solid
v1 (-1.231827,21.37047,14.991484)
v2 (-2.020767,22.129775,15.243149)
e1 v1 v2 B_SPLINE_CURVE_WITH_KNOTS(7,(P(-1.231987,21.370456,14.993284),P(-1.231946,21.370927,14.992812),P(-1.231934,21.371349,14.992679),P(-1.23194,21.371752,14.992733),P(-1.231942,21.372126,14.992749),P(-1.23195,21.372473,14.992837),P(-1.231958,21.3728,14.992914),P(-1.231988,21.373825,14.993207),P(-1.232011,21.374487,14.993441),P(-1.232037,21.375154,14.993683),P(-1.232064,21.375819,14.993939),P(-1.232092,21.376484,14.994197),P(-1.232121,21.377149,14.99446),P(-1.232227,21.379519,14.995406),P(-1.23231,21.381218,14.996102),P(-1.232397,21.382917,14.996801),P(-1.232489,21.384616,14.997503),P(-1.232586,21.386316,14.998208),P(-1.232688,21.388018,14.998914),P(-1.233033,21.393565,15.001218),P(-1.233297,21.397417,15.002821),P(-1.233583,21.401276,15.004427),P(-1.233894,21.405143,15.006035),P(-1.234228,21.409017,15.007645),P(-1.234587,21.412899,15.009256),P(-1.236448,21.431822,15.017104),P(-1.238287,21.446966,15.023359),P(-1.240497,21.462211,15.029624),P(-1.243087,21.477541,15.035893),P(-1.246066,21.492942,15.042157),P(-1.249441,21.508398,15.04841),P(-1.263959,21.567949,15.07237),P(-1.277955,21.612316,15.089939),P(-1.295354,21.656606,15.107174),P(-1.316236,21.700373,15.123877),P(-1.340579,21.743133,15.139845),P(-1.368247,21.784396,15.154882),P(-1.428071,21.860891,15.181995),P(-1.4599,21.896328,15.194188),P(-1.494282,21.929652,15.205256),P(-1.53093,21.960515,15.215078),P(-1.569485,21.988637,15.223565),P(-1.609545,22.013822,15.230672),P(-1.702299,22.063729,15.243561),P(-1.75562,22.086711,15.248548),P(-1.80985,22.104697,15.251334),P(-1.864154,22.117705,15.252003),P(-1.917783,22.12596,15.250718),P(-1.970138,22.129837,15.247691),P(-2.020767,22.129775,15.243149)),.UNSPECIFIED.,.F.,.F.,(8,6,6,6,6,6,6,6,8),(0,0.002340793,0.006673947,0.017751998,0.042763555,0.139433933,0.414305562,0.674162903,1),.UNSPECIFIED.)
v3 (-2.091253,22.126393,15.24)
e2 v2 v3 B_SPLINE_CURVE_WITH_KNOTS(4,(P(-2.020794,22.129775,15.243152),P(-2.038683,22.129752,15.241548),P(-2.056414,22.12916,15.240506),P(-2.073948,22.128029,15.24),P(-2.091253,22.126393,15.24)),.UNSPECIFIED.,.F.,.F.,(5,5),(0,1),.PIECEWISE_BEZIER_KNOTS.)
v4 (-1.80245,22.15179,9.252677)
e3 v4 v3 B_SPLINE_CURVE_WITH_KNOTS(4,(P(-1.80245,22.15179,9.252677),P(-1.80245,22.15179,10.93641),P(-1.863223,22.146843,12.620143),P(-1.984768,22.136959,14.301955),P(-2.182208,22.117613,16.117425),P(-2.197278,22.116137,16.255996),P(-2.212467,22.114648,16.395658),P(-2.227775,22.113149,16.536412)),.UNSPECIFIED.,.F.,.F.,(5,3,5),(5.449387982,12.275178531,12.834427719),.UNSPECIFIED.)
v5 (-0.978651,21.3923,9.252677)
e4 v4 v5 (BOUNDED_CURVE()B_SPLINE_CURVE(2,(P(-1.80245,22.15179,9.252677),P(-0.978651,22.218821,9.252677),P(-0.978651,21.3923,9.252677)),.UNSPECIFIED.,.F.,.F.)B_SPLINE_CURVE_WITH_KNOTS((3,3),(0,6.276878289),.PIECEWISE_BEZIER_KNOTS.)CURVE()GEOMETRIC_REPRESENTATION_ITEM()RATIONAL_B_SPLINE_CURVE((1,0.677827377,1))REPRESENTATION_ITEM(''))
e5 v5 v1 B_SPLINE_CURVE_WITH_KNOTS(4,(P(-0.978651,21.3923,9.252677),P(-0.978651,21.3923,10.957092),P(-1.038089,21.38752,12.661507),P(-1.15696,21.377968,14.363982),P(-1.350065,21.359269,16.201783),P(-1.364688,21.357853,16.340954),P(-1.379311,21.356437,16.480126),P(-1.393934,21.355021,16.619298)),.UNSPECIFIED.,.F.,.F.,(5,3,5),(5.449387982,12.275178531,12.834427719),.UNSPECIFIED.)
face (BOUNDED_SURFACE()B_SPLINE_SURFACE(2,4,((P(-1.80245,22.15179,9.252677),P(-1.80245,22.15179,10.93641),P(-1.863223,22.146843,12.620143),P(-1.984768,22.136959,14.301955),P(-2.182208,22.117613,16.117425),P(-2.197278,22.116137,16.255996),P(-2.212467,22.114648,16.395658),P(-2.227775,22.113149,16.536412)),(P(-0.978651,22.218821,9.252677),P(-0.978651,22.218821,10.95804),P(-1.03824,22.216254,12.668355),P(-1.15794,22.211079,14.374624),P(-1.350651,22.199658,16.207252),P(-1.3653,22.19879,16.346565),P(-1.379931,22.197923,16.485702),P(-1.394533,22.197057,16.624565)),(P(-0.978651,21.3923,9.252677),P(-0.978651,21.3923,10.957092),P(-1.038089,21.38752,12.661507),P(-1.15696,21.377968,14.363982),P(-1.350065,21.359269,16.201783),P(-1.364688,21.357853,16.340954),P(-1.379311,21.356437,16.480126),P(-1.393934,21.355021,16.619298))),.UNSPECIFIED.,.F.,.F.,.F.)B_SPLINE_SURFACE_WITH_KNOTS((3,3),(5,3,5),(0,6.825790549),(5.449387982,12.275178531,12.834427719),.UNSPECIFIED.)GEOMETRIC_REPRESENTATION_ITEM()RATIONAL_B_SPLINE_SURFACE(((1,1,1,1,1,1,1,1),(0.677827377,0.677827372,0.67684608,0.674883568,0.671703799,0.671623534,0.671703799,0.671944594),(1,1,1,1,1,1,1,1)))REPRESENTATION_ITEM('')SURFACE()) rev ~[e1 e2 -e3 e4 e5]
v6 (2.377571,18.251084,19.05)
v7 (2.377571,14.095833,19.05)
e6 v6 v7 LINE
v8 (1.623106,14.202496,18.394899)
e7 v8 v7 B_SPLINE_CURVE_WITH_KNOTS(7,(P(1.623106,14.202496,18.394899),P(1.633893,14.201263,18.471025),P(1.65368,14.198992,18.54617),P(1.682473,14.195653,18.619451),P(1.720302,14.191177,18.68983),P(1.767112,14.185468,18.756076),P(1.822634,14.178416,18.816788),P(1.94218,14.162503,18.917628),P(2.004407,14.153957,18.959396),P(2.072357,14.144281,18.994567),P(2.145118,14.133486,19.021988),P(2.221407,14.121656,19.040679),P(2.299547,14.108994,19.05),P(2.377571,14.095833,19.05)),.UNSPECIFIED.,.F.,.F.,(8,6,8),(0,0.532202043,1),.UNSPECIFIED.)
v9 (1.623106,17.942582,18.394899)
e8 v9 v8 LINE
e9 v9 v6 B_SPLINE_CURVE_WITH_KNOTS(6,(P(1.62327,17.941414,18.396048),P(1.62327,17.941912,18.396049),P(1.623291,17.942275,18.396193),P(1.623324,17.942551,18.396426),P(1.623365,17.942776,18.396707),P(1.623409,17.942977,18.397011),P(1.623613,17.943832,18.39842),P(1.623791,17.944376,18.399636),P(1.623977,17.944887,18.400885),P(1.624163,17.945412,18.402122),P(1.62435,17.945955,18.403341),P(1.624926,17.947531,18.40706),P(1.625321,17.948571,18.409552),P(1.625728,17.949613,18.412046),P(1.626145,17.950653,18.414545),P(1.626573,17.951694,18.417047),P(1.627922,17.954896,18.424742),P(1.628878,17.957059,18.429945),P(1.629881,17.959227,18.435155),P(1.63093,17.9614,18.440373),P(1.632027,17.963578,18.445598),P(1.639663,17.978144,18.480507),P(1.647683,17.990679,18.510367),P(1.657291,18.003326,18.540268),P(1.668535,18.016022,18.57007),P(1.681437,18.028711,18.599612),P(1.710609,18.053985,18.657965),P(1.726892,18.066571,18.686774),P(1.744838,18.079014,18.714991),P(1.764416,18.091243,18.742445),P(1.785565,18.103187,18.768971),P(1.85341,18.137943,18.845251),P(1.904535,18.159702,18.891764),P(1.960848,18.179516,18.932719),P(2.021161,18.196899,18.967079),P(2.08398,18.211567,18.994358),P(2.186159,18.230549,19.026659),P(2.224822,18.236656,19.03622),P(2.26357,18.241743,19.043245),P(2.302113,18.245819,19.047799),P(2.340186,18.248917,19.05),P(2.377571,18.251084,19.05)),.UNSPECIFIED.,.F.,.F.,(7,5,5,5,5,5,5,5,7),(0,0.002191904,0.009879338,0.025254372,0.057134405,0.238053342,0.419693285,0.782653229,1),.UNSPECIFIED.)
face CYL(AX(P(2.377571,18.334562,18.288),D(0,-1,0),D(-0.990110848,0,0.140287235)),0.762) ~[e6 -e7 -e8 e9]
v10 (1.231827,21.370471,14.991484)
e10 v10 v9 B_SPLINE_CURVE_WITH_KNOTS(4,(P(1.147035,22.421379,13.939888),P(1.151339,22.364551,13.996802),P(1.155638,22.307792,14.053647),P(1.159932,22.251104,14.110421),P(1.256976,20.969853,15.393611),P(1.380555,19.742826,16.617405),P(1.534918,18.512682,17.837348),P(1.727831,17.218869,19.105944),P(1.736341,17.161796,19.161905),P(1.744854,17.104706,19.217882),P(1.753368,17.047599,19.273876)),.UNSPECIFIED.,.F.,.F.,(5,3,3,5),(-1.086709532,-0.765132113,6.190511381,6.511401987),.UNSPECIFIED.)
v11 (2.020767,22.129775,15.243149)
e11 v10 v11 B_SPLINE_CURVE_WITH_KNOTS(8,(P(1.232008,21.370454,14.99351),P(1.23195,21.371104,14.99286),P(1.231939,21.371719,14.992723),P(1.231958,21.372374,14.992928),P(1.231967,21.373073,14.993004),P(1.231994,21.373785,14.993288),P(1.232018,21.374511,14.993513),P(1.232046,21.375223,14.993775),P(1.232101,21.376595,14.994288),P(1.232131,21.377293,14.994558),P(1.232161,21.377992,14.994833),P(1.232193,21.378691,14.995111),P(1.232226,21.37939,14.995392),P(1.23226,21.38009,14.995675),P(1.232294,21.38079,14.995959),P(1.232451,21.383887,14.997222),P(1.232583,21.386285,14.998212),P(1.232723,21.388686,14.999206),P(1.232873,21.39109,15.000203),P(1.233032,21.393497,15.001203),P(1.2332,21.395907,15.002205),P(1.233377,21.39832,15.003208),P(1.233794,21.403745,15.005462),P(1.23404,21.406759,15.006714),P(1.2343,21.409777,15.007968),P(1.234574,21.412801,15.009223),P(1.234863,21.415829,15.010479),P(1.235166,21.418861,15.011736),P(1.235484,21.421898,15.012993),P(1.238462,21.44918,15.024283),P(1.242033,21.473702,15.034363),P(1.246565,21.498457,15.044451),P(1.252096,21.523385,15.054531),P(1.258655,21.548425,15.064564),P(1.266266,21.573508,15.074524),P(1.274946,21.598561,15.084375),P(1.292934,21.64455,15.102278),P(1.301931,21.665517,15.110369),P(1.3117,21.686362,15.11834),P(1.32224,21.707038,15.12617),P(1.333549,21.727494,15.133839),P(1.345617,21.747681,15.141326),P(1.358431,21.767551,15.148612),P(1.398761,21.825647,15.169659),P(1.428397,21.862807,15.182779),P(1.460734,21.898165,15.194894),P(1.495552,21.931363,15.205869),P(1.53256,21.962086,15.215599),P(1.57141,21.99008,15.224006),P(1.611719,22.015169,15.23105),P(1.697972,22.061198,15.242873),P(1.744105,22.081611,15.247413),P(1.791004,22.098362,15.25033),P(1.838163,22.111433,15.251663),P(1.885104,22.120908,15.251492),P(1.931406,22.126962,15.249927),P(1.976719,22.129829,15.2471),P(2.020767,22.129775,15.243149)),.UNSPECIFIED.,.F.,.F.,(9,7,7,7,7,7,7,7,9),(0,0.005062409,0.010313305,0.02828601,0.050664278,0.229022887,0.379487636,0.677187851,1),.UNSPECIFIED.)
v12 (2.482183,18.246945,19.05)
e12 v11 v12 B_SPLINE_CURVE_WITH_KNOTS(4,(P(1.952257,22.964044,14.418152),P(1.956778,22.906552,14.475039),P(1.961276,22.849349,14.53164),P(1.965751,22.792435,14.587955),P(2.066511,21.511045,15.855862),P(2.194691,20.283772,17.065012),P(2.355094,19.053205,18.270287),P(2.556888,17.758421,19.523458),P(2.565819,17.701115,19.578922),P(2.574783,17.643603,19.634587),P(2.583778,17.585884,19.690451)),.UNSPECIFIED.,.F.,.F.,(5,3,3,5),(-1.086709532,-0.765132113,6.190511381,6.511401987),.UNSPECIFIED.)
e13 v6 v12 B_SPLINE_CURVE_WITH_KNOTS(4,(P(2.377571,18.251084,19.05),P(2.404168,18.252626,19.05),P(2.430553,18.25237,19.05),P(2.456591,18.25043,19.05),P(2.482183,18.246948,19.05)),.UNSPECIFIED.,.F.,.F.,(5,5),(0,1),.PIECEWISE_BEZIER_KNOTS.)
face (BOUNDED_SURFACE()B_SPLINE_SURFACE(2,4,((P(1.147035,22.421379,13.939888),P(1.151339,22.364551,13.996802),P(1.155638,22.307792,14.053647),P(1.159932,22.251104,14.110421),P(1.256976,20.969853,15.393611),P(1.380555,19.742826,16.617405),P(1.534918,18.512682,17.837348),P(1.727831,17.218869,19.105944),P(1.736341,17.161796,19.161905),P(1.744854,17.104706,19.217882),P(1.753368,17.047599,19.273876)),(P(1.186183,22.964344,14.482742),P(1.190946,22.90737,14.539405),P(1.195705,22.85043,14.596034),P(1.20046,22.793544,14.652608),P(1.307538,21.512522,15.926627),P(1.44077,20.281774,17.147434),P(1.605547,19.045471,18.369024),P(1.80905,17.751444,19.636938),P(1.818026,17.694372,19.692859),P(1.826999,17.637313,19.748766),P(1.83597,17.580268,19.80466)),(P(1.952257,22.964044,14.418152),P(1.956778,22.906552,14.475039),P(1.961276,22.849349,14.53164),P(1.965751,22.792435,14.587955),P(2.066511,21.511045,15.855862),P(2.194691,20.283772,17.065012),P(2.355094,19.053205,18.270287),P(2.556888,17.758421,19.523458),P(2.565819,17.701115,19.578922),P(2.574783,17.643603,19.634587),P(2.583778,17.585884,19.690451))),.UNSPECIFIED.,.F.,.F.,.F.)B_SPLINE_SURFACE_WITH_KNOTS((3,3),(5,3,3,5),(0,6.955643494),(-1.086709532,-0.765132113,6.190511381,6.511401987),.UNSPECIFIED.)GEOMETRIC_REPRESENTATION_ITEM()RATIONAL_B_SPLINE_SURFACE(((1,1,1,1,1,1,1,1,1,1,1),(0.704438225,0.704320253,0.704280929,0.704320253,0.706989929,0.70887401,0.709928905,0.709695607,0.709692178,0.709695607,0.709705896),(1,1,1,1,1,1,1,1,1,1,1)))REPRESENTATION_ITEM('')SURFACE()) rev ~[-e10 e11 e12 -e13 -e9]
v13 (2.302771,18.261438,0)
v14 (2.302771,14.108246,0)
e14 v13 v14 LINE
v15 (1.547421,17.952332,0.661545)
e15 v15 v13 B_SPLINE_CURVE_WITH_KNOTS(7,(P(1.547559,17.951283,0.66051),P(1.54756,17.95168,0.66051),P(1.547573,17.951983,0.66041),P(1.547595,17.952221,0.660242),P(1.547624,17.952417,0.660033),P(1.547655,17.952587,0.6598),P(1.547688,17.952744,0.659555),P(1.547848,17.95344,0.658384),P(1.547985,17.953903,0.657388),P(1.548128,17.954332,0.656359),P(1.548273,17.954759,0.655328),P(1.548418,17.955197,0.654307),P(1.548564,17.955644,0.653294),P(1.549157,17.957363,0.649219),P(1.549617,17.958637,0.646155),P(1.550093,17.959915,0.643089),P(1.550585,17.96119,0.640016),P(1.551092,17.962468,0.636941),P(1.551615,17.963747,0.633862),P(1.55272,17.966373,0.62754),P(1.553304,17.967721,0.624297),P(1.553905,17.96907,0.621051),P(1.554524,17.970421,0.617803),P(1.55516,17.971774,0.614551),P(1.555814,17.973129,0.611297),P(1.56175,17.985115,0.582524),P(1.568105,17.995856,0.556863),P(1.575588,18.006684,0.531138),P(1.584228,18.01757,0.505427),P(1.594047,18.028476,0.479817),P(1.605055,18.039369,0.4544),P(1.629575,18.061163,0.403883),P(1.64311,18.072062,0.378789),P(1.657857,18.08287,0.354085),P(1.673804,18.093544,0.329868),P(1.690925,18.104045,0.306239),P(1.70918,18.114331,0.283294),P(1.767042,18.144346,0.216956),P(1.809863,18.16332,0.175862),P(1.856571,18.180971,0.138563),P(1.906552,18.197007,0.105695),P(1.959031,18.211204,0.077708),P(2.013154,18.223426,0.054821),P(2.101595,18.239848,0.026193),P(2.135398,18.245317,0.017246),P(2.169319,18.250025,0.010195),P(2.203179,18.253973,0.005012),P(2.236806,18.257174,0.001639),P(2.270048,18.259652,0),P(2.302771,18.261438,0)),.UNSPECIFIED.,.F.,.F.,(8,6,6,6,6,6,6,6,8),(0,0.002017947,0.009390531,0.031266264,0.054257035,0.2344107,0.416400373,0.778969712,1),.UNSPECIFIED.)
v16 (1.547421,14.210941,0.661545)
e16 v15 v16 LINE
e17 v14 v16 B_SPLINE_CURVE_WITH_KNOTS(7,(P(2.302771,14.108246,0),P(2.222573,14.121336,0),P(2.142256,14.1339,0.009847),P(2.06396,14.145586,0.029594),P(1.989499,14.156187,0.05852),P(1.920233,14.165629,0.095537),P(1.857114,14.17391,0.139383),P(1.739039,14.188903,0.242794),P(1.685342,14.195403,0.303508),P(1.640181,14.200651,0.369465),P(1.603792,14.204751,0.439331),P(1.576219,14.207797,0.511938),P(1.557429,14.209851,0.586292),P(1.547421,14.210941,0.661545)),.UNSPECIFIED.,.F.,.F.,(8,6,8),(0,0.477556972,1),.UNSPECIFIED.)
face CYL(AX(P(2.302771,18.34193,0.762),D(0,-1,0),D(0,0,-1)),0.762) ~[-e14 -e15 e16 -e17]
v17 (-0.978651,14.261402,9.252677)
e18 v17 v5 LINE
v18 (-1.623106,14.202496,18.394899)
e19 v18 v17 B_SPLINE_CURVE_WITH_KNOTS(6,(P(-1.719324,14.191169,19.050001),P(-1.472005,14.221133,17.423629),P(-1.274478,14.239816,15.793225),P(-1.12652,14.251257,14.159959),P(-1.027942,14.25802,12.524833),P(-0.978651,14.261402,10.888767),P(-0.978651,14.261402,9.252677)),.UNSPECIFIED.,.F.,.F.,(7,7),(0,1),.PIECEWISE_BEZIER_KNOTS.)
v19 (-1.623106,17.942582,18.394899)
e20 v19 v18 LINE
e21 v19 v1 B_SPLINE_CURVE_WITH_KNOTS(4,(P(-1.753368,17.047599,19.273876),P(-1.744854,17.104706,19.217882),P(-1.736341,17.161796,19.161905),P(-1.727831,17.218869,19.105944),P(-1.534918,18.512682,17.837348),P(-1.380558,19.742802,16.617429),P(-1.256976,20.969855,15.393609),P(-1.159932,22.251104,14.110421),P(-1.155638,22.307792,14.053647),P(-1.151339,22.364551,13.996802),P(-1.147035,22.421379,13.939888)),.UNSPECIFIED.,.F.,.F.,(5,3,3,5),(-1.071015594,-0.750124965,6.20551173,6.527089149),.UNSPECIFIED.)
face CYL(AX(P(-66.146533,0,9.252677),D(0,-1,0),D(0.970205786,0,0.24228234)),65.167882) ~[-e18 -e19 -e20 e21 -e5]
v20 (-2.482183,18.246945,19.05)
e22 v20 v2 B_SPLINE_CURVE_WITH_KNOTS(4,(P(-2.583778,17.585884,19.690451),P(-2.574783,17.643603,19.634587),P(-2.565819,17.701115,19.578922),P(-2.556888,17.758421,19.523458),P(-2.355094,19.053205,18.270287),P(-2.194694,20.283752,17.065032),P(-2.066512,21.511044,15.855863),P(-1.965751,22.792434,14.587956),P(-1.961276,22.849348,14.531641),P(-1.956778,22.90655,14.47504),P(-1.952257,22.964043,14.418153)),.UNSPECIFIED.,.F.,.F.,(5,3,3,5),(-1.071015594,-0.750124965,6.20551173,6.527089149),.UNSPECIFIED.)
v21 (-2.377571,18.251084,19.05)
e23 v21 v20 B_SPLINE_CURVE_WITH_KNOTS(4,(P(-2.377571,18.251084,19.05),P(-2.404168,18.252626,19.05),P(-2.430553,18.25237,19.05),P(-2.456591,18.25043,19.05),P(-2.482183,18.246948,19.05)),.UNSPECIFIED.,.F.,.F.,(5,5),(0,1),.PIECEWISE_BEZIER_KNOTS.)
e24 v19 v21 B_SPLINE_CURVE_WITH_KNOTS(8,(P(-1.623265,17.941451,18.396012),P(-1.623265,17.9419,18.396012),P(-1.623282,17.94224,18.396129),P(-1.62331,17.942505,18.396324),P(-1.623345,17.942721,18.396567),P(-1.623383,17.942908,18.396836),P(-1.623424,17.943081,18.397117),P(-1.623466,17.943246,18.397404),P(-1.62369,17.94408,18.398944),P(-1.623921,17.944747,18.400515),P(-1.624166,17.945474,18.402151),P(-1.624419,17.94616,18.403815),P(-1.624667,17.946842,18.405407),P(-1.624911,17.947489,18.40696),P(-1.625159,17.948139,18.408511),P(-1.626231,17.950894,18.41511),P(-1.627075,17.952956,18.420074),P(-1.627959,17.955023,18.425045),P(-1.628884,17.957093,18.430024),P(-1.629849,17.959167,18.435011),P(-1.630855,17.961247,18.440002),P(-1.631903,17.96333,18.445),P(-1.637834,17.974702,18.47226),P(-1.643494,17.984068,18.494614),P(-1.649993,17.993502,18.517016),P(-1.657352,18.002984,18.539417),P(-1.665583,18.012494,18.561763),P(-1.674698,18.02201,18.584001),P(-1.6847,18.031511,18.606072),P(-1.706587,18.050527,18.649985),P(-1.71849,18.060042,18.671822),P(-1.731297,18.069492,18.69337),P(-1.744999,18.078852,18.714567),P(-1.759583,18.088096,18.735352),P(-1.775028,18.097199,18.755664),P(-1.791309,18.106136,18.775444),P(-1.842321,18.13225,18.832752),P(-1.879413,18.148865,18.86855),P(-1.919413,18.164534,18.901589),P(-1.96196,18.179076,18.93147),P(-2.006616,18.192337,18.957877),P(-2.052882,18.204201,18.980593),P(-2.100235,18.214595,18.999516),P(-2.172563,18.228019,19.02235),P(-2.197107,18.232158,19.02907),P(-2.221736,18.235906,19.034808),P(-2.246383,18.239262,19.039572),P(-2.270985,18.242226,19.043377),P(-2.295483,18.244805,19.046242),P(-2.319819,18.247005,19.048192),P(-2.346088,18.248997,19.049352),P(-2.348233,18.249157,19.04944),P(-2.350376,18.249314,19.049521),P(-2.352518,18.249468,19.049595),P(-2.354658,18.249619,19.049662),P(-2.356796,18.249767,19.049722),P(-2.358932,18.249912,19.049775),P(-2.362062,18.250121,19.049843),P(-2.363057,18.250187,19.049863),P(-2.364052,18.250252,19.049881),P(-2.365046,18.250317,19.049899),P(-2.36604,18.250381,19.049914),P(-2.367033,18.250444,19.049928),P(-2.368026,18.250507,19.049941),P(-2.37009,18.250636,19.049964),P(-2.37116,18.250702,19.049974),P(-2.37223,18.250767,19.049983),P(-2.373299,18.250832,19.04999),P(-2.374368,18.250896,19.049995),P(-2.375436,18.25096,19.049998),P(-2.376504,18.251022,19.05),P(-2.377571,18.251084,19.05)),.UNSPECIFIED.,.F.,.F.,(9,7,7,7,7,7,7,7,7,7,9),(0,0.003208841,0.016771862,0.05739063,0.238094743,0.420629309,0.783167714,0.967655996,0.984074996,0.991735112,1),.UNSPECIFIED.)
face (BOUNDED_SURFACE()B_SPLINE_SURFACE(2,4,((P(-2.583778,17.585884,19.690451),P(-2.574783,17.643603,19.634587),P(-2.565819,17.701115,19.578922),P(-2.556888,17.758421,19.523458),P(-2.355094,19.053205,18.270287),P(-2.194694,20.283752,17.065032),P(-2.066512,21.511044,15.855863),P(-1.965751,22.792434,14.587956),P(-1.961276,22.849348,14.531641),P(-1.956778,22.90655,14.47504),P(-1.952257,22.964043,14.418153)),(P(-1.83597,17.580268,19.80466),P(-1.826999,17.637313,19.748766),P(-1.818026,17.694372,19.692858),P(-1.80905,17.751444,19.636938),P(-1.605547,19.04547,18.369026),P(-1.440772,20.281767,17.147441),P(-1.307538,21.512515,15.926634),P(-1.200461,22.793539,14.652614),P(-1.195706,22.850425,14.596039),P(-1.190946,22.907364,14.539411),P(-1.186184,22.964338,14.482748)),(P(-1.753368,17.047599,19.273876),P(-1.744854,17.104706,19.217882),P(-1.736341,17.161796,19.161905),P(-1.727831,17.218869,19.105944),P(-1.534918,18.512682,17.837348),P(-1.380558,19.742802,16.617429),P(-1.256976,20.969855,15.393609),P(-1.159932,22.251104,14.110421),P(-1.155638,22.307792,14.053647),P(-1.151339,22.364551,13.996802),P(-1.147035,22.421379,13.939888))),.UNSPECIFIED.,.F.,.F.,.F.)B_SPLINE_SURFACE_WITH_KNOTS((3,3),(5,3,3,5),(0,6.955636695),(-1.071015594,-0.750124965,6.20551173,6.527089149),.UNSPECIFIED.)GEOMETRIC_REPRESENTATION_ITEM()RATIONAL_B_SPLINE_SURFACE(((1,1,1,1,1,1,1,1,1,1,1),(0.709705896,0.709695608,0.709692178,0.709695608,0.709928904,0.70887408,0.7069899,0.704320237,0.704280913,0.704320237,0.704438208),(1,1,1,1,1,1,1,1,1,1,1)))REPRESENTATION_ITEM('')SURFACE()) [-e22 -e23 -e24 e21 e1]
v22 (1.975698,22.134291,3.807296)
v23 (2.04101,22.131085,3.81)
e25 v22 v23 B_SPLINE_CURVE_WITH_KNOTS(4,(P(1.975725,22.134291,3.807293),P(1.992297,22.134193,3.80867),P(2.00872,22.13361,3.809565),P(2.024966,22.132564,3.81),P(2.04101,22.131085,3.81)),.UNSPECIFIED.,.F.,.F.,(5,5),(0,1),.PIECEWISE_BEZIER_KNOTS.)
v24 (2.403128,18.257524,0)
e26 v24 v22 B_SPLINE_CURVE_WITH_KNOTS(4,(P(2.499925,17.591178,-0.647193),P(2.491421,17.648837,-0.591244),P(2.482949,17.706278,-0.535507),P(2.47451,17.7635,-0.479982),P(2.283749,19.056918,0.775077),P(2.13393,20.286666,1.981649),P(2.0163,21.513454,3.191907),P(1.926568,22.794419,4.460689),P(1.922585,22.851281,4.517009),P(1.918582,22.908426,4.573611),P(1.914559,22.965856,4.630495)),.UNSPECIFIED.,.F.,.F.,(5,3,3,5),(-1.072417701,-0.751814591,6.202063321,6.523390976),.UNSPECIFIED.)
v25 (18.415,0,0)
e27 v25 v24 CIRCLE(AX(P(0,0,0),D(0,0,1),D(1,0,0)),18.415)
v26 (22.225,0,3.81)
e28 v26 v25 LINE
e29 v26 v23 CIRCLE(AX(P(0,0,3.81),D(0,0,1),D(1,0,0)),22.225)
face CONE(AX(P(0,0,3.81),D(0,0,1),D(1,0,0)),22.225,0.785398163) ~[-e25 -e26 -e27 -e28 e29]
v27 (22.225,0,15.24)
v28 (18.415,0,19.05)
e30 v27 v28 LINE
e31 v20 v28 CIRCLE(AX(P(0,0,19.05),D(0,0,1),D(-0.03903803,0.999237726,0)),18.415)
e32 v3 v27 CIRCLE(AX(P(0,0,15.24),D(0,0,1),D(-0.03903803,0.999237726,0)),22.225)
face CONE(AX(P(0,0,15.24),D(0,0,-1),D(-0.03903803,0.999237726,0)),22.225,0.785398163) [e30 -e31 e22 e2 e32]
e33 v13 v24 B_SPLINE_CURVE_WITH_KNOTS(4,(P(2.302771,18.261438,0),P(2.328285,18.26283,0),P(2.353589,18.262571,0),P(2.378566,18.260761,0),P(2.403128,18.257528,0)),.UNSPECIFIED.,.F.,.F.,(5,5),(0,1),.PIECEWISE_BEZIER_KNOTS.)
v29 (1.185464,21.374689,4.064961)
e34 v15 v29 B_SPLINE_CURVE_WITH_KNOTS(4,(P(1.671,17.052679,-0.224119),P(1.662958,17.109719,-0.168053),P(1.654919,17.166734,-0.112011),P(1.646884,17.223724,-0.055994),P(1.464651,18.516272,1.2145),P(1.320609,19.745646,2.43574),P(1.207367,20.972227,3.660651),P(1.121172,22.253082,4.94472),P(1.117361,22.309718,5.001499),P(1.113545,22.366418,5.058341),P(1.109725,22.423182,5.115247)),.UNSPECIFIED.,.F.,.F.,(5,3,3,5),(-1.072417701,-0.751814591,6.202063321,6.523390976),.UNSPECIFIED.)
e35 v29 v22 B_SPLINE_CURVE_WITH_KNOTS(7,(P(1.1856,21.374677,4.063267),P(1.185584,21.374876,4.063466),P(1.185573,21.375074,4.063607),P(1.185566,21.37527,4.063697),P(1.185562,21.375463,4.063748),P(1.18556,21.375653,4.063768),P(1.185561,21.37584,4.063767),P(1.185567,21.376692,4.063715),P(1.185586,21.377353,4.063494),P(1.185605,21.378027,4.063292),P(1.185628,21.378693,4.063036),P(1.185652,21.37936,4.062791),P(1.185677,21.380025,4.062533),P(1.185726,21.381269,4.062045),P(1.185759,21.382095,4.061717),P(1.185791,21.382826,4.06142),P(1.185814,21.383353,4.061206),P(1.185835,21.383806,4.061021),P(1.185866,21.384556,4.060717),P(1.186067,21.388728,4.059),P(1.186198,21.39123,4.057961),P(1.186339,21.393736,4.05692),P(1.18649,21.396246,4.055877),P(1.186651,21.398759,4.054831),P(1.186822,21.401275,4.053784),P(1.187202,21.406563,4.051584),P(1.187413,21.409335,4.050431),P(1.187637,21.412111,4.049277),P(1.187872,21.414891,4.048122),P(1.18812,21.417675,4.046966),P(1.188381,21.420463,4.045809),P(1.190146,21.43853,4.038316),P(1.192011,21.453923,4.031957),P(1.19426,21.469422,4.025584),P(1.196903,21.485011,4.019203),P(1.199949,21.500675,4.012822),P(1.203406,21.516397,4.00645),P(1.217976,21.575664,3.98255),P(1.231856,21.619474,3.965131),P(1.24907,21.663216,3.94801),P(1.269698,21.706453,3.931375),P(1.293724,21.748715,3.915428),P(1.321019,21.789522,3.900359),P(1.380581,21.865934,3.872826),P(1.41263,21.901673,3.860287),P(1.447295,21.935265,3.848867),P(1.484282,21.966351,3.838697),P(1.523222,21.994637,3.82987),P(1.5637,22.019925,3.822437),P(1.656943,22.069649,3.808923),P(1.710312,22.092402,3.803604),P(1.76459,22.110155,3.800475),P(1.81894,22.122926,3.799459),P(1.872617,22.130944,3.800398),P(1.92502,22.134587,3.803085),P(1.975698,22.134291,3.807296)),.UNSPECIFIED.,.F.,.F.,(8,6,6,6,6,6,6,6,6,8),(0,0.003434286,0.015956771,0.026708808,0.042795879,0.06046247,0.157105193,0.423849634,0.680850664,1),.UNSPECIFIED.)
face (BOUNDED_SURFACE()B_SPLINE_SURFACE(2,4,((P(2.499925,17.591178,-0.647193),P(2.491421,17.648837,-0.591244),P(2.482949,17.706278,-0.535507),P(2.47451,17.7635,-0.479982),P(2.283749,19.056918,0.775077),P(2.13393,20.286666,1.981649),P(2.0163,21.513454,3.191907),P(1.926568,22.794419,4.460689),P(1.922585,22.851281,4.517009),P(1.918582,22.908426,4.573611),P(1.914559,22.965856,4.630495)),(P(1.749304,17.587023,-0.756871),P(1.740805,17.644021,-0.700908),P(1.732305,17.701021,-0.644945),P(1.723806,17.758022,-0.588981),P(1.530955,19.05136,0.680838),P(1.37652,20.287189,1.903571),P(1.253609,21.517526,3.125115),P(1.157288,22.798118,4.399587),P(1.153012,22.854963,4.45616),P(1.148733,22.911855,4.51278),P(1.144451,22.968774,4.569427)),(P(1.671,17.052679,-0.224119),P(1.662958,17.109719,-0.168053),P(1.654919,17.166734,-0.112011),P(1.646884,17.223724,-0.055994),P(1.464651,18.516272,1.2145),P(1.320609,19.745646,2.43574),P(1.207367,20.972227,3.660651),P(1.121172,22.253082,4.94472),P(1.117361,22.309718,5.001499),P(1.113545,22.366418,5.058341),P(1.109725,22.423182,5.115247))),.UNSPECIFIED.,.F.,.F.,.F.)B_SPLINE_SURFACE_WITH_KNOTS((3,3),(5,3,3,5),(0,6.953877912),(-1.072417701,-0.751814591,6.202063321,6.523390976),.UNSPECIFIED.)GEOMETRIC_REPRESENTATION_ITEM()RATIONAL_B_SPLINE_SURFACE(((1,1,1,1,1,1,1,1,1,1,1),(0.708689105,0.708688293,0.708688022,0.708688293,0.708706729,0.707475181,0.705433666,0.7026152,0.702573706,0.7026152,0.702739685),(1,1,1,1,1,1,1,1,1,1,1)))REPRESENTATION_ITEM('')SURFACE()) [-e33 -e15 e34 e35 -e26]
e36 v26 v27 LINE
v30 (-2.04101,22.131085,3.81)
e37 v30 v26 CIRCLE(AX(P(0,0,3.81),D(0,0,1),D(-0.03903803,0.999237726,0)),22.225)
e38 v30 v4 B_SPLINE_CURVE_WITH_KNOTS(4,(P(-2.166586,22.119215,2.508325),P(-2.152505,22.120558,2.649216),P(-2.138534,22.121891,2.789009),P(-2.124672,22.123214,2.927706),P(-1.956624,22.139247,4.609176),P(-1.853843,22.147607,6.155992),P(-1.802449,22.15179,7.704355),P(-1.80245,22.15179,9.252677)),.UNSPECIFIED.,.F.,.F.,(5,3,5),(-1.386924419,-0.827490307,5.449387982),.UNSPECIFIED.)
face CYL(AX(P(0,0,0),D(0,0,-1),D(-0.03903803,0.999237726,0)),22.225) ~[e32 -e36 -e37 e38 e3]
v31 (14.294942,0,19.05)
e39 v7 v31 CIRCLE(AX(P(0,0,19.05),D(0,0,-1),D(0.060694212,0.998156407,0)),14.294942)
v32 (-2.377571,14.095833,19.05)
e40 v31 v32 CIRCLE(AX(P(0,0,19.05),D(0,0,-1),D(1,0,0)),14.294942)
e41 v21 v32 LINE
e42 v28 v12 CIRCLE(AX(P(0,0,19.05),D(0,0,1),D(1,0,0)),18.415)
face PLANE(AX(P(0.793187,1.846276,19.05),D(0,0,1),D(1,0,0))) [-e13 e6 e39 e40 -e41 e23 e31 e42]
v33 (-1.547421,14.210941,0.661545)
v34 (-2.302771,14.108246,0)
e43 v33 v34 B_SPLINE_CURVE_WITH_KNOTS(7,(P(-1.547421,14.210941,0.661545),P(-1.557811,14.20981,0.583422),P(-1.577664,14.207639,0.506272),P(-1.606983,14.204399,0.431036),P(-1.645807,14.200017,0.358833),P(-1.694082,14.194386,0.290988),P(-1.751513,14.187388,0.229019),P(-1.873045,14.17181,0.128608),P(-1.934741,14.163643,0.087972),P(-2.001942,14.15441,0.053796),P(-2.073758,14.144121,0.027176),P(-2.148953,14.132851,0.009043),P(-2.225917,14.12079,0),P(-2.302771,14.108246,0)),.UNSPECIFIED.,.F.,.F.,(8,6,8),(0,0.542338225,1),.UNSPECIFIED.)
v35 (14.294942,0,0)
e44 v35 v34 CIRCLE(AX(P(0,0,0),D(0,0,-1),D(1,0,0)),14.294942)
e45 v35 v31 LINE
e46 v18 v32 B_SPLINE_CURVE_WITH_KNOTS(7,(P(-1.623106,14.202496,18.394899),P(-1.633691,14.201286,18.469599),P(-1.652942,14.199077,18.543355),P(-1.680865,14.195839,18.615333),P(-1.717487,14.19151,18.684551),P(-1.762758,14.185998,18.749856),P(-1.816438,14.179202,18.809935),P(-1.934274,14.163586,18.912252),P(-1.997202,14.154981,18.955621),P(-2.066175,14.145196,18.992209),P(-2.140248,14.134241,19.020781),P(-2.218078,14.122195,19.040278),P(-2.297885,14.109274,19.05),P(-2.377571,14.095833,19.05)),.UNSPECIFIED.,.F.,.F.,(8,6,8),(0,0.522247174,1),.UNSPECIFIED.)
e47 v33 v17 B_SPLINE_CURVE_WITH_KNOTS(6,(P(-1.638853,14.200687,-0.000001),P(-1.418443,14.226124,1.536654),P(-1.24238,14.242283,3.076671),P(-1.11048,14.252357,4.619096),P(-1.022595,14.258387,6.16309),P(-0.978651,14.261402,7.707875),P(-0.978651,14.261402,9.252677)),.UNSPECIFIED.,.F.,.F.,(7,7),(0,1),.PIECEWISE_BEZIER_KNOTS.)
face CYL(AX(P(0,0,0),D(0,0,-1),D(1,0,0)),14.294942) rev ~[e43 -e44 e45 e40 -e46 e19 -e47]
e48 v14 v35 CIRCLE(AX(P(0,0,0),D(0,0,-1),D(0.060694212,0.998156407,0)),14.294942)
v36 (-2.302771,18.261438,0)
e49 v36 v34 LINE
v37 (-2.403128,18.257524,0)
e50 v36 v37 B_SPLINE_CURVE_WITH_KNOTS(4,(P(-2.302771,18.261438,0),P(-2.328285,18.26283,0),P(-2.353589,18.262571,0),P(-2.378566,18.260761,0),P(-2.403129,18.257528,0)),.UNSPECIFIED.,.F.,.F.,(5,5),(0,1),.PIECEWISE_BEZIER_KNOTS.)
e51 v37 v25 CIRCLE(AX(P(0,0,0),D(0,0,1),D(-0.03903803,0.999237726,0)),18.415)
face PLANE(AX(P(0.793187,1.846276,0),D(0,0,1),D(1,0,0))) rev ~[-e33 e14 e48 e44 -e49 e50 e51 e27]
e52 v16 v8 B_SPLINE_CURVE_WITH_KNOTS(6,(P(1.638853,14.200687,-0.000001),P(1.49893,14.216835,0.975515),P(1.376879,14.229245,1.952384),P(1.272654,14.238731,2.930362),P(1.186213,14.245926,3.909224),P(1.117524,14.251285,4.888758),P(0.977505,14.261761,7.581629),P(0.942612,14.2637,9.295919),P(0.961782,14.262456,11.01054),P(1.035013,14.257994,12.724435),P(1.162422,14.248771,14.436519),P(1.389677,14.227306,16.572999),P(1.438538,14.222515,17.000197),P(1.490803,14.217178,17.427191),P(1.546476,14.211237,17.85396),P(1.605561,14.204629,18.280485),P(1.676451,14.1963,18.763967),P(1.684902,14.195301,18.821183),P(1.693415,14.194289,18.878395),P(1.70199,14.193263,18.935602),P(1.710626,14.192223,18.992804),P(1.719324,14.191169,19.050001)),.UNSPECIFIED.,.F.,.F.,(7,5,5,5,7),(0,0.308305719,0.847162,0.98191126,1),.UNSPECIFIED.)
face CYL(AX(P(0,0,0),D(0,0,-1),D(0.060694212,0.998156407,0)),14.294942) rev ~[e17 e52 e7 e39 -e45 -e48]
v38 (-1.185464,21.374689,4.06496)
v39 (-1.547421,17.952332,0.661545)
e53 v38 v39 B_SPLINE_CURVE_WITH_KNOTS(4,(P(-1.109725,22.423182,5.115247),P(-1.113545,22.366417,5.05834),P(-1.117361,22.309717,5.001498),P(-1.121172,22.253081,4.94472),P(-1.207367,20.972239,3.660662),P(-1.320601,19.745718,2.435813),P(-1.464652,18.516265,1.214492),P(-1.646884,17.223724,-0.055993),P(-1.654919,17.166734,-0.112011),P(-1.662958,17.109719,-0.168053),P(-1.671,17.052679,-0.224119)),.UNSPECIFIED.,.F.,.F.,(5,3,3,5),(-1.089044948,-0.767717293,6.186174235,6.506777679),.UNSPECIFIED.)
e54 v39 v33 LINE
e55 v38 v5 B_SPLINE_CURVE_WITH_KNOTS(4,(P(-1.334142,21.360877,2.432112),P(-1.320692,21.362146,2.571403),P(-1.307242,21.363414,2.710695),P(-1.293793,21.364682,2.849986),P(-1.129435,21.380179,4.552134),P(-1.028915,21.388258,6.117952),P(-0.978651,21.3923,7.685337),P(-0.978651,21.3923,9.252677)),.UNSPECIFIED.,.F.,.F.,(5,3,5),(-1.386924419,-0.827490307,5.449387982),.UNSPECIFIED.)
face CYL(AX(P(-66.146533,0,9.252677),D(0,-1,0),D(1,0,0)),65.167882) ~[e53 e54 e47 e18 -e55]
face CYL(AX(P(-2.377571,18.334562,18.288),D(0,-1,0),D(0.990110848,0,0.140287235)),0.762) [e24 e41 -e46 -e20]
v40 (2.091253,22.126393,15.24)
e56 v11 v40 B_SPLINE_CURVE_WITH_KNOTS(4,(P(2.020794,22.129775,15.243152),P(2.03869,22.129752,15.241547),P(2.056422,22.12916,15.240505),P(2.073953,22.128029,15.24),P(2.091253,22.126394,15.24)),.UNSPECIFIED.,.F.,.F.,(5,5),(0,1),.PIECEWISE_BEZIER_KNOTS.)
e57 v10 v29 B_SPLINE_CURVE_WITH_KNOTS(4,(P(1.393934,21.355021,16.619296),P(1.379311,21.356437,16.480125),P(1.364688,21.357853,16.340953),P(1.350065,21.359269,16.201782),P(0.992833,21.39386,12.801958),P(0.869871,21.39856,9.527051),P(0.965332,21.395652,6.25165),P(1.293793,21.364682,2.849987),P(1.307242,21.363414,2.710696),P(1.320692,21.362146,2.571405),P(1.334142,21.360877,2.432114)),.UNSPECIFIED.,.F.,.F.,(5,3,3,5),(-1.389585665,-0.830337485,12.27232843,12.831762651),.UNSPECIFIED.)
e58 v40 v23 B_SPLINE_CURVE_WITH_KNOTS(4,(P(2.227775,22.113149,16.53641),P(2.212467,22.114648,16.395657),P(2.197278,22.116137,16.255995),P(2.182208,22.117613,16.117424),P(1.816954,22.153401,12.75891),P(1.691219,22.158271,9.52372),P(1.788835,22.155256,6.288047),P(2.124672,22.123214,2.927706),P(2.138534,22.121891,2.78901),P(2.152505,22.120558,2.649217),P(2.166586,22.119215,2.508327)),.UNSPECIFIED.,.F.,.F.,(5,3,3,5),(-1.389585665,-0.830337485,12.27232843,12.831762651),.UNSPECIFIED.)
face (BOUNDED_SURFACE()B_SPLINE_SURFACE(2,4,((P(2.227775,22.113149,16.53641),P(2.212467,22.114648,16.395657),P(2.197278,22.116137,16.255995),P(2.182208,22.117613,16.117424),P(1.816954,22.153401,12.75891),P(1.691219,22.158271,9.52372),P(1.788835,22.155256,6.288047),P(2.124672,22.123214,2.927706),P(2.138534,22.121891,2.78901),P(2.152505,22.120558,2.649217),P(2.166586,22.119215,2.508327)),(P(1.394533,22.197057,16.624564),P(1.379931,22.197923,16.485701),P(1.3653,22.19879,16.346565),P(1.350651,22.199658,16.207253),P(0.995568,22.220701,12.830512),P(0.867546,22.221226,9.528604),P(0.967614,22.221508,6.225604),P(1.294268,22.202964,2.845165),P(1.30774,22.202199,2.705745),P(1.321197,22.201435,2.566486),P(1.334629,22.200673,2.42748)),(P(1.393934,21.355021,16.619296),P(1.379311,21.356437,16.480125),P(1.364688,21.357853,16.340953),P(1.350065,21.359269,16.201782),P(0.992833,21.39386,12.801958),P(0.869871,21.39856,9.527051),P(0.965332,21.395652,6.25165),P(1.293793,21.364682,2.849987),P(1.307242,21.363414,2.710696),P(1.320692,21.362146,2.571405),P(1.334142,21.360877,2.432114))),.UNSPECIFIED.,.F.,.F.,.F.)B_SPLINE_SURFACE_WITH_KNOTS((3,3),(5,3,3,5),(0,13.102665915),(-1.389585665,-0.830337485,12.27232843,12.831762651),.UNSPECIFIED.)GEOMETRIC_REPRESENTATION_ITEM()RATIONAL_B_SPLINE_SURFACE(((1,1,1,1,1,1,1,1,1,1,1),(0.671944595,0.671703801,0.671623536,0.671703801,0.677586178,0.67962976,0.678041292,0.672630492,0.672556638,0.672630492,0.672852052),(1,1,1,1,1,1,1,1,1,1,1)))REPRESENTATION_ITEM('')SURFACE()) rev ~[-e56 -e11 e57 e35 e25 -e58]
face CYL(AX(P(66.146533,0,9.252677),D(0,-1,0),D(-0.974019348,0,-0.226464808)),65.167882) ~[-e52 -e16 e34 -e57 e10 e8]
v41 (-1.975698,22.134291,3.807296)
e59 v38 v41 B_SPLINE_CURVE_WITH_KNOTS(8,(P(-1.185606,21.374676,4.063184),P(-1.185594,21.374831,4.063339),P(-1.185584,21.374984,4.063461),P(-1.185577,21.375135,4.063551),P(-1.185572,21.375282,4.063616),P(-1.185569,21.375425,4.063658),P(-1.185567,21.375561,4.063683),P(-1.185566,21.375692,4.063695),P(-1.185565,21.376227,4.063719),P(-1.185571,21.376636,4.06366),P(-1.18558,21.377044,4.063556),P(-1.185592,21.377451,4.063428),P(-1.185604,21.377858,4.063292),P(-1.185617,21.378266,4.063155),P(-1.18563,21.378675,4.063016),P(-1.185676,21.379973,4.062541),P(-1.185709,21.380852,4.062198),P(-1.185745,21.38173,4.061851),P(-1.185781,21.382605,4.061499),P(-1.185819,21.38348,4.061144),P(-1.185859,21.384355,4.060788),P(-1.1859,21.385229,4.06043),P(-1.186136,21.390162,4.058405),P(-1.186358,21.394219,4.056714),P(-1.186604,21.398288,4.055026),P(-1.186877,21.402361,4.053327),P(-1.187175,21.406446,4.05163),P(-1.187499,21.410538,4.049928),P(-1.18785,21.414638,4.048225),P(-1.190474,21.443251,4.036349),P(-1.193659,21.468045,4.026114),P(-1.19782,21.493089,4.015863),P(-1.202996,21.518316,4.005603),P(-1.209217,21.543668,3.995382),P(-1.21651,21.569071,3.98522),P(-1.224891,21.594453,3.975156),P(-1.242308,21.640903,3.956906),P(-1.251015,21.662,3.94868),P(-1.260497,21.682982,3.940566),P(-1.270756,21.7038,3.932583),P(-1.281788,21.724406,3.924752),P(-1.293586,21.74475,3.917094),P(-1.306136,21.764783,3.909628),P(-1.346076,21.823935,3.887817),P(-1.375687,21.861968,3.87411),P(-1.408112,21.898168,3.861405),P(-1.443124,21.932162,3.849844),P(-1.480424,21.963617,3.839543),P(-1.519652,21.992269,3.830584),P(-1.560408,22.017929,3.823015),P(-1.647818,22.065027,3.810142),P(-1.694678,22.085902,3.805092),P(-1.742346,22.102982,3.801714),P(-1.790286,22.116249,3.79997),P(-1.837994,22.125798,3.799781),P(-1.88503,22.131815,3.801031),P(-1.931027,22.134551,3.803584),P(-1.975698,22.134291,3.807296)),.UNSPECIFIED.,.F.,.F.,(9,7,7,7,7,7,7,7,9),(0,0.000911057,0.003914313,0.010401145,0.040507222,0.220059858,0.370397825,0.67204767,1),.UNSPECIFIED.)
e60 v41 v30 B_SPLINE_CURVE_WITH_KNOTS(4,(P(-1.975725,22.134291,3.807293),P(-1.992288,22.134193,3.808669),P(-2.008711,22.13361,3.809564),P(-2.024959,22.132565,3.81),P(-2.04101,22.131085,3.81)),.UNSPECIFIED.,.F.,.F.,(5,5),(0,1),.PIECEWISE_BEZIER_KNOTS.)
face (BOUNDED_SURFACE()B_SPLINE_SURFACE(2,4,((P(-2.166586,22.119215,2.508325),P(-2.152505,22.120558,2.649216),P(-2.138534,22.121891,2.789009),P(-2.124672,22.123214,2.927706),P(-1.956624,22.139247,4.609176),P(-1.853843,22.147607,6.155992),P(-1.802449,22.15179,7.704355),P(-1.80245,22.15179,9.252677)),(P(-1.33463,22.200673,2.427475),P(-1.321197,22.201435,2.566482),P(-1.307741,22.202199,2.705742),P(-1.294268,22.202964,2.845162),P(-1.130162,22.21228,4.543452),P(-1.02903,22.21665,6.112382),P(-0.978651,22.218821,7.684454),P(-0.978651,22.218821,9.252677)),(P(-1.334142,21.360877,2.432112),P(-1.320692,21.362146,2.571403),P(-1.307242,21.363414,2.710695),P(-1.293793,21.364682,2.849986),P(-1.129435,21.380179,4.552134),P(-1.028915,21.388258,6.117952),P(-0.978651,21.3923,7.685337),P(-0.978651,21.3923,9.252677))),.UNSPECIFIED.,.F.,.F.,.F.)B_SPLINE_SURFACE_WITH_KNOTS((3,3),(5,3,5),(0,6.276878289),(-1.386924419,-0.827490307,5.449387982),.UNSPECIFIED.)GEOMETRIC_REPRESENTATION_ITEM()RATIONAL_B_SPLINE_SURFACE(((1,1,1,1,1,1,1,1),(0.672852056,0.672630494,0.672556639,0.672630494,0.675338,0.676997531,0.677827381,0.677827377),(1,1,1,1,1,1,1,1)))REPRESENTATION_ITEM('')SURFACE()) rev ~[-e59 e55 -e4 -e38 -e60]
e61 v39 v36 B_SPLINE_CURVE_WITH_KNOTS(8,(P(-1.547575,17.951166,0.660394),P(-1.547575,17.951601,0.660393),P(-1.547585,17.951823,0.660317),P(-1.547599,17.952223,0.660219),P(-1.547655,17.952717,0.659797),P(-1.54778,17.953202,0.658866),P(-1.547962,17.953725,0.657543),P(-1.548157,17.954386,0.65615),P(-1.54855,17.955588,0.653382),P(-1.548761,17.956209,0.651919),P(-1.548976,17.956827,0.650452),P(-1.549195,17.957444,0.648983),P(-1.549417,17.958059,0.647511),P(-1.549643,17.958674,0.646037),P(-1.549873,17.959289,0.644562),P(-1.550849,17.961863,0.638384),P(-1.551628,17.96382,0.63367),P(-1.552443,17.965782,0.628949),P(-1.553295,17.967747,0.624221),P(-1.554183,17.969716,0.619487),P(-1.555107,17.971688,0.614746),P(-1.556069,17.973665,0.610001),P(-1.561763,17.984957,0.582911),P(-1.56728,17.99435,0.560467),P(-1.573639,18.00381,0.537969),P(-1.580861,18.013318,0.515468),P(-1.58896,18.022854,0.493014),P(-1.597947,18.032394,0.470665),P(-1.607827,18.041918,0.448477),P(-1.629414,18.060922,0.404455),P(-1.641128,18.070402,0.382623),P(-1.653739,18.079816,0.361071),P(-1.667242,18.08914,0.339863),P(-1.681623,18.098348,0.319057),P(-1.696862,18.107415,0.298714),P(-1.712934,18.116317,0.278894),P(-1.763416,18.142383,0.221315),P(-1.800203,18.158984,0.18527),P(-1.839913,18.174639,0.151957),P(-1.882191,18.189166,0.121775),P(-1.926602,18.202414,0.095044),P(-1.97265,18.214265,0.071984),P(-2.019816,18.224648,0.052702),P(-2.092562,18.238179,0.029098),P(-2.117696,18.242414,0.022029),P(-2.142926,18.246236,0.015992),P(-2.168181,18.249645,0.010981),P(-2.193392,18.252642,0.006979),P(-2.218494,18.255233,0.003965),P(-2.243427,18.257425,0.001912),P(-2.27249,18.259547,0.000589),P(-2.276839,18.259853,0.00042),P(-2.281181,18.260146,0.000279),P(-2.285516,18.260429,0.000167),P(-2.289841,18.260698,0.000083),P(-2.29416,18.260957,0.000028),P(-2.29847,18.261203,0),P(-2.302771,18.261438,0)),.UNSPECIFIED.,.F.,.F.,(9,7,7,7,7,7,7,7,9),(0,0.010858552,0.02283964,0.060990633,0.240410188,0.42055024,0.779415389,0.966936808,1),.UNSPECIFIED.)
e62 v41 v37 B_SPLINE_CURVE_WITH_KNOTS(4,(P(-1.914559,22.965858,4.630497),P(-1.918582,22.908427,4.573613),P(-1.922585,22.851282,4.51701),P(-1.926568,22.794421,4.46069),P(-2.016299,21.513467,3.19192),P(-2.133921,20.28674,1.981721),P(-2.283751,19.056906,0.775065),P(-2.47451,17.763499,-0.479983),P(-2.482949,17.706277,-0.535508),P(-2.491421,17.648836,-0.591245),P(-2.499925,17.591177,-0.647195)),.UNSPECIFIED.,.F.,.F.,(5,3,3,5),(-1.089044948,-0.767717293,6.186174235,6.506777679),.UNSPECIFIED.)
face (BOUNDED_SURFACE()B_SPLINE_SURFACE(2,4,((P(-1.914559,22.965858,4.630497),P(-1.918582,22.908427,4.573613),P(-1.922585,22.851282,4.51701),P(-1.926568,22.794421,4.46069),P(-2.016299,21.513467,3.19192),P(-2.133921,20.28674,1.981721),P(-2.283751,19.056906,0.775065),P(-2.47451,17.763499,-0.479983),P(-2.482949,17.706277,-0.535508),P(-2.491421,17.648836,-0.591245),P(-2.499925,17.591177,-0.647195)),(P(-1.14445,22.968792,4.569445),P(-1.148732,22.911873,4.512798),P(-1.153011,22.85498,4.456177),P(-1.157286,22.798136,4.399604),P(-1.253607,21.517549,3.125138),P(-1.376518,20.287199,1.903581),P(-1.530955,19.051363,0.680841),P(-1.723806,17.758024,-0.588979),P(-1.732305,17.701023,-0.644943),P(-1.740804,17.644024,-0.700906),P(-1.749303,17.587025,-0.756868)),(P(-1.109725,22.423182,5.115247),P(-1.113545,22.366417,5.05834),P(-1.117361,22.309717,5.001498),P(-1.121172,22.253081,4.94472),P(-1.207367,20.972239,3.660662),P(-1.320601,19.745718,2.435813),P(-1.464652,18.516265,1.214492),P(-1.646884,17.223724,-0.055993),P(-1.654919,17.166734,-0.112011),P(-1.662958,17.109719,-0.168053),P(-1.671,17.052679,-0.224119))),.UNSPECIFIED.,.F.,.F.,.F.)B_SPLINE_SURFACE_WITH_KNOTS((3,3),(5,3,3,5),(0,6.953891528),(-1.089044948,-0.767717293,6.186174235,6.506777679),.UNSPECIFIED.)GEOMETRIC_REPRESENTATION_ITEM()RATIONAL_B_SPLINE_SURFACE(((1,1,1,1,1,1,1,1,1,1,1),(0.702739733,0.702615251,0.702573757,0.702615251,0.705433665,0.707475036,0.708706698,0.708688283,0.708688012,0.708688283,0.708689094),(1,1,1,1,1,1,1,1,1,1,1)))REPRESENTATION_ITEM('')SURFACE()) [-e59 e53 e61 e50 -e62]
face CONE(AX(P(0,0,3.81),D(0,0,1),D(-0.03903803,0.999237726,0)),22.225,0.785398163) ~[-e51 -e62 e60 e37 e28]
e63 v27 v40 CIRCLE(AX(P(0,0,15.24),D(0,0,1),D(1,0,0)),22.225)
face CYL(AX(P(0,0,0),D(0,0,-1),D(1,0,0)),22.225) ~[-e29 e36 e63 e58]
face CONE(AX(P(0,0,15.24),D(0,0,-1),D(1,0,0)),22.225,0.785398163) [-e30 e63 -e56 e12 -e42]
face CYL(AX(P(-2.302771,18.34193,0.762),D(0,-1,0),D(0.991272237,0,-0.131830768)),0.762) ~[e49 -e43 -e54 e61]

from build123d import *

# Parameters (mm, degrees)
F1_DEPTH = 19.05
F2_SIZE  = 3.81
F4_DEPTH = 25.4
F5_R     = 0.762


with BuildPart() as f1:
    # F0 (on Top) → F1 (new body)
    with BuildSketch(Plane.XY):
        with BuildLine():
            ThreePointArc((0.8676202269, 14.2685876747), (10.4102819289, 9.7964988261), (14.2949417309, 0))
            ThreePointArc((14.2949417309, 0), (-9.7964988261, -10.4102819289), (-0.8676202269, 14.2685876747))
            Line((-0.8676202269, 14.2685876747), (-0.8676202269, 22.2080584505))
            ThreePointArc((-0.8676202269, 22.2080584505), (-15.4056445087, -16.019261602), (22.225, 0))
            ThreePointArc((22.225, 0), (16.019261602, 15.4056445087), (0.8676202269, 22.2080584505))
            Line((0.8676202269, 22.2080584505), (0.8676202269, 14.2685876747))
        make_face()
    extrude(amount=F1_DEPTH)

    # F2
    f2_edges = [f1.edges().sort_by_distance(p)[0] for p in [
        (-15.405645, -16.019262, 19.05),
        (-15.405645, -16.019262, 0),
    ]]
    chamfer(f2_edges, length=F2_SIZE)

    # F3 (on Front) → F4 (cut)
    with BuildSketch(Plane.XZ):
        with BuildLine():
            ThreePointArc((2.6717553826, -5.5055550528), (0.9808079105, 9.7828422745), (2.9202771279, 25.0417038096))
            Line((2.9202771279, 25.0417038096), (-2.9202771279, 25.0417038096))
            ThreePointArc((-2.9202771279, 25.0417038096), (-1.465879157, 17.2066583018), (-0.9786513266, 9.2526768707))
            ThreePointArc((-0.9786513266, 9.2526768707), (-1.4033109655, 1.8251602795), (-2.6717553826, -5.5055550528))
            Line((-2.6717553826, -5.5055550528), (2.6717553826, -5.5055550528))
        make_face()
    extrude(amount=-F4_DEPTH, mode=Mode.SUBTRACT)

    # F5
    f5_edges = [f1.edges().sort_by_distance(p)[0] for p in [
        (-1.45887, 20.2631, 17.149451),
        (1.45887, 20.2631, 17.149451),
        (-0.979225, 22.203417, 9.526057),
        (0.979225, 22.203417, 9.526057),
        (1.719324, 16.262865, 19.05),
        (-1.719324, 16.262865, 19.05),
        (-1.394665, 20.267988, 1.900916),
        (-1.638853, 16.271309, 0),
        (1.394665, 20.267988, 1.900916),
        (1.638853, 16.271309, 0),
    ]]
    fillet(f5_edges, radius=F5_R)


solid = f1.part
